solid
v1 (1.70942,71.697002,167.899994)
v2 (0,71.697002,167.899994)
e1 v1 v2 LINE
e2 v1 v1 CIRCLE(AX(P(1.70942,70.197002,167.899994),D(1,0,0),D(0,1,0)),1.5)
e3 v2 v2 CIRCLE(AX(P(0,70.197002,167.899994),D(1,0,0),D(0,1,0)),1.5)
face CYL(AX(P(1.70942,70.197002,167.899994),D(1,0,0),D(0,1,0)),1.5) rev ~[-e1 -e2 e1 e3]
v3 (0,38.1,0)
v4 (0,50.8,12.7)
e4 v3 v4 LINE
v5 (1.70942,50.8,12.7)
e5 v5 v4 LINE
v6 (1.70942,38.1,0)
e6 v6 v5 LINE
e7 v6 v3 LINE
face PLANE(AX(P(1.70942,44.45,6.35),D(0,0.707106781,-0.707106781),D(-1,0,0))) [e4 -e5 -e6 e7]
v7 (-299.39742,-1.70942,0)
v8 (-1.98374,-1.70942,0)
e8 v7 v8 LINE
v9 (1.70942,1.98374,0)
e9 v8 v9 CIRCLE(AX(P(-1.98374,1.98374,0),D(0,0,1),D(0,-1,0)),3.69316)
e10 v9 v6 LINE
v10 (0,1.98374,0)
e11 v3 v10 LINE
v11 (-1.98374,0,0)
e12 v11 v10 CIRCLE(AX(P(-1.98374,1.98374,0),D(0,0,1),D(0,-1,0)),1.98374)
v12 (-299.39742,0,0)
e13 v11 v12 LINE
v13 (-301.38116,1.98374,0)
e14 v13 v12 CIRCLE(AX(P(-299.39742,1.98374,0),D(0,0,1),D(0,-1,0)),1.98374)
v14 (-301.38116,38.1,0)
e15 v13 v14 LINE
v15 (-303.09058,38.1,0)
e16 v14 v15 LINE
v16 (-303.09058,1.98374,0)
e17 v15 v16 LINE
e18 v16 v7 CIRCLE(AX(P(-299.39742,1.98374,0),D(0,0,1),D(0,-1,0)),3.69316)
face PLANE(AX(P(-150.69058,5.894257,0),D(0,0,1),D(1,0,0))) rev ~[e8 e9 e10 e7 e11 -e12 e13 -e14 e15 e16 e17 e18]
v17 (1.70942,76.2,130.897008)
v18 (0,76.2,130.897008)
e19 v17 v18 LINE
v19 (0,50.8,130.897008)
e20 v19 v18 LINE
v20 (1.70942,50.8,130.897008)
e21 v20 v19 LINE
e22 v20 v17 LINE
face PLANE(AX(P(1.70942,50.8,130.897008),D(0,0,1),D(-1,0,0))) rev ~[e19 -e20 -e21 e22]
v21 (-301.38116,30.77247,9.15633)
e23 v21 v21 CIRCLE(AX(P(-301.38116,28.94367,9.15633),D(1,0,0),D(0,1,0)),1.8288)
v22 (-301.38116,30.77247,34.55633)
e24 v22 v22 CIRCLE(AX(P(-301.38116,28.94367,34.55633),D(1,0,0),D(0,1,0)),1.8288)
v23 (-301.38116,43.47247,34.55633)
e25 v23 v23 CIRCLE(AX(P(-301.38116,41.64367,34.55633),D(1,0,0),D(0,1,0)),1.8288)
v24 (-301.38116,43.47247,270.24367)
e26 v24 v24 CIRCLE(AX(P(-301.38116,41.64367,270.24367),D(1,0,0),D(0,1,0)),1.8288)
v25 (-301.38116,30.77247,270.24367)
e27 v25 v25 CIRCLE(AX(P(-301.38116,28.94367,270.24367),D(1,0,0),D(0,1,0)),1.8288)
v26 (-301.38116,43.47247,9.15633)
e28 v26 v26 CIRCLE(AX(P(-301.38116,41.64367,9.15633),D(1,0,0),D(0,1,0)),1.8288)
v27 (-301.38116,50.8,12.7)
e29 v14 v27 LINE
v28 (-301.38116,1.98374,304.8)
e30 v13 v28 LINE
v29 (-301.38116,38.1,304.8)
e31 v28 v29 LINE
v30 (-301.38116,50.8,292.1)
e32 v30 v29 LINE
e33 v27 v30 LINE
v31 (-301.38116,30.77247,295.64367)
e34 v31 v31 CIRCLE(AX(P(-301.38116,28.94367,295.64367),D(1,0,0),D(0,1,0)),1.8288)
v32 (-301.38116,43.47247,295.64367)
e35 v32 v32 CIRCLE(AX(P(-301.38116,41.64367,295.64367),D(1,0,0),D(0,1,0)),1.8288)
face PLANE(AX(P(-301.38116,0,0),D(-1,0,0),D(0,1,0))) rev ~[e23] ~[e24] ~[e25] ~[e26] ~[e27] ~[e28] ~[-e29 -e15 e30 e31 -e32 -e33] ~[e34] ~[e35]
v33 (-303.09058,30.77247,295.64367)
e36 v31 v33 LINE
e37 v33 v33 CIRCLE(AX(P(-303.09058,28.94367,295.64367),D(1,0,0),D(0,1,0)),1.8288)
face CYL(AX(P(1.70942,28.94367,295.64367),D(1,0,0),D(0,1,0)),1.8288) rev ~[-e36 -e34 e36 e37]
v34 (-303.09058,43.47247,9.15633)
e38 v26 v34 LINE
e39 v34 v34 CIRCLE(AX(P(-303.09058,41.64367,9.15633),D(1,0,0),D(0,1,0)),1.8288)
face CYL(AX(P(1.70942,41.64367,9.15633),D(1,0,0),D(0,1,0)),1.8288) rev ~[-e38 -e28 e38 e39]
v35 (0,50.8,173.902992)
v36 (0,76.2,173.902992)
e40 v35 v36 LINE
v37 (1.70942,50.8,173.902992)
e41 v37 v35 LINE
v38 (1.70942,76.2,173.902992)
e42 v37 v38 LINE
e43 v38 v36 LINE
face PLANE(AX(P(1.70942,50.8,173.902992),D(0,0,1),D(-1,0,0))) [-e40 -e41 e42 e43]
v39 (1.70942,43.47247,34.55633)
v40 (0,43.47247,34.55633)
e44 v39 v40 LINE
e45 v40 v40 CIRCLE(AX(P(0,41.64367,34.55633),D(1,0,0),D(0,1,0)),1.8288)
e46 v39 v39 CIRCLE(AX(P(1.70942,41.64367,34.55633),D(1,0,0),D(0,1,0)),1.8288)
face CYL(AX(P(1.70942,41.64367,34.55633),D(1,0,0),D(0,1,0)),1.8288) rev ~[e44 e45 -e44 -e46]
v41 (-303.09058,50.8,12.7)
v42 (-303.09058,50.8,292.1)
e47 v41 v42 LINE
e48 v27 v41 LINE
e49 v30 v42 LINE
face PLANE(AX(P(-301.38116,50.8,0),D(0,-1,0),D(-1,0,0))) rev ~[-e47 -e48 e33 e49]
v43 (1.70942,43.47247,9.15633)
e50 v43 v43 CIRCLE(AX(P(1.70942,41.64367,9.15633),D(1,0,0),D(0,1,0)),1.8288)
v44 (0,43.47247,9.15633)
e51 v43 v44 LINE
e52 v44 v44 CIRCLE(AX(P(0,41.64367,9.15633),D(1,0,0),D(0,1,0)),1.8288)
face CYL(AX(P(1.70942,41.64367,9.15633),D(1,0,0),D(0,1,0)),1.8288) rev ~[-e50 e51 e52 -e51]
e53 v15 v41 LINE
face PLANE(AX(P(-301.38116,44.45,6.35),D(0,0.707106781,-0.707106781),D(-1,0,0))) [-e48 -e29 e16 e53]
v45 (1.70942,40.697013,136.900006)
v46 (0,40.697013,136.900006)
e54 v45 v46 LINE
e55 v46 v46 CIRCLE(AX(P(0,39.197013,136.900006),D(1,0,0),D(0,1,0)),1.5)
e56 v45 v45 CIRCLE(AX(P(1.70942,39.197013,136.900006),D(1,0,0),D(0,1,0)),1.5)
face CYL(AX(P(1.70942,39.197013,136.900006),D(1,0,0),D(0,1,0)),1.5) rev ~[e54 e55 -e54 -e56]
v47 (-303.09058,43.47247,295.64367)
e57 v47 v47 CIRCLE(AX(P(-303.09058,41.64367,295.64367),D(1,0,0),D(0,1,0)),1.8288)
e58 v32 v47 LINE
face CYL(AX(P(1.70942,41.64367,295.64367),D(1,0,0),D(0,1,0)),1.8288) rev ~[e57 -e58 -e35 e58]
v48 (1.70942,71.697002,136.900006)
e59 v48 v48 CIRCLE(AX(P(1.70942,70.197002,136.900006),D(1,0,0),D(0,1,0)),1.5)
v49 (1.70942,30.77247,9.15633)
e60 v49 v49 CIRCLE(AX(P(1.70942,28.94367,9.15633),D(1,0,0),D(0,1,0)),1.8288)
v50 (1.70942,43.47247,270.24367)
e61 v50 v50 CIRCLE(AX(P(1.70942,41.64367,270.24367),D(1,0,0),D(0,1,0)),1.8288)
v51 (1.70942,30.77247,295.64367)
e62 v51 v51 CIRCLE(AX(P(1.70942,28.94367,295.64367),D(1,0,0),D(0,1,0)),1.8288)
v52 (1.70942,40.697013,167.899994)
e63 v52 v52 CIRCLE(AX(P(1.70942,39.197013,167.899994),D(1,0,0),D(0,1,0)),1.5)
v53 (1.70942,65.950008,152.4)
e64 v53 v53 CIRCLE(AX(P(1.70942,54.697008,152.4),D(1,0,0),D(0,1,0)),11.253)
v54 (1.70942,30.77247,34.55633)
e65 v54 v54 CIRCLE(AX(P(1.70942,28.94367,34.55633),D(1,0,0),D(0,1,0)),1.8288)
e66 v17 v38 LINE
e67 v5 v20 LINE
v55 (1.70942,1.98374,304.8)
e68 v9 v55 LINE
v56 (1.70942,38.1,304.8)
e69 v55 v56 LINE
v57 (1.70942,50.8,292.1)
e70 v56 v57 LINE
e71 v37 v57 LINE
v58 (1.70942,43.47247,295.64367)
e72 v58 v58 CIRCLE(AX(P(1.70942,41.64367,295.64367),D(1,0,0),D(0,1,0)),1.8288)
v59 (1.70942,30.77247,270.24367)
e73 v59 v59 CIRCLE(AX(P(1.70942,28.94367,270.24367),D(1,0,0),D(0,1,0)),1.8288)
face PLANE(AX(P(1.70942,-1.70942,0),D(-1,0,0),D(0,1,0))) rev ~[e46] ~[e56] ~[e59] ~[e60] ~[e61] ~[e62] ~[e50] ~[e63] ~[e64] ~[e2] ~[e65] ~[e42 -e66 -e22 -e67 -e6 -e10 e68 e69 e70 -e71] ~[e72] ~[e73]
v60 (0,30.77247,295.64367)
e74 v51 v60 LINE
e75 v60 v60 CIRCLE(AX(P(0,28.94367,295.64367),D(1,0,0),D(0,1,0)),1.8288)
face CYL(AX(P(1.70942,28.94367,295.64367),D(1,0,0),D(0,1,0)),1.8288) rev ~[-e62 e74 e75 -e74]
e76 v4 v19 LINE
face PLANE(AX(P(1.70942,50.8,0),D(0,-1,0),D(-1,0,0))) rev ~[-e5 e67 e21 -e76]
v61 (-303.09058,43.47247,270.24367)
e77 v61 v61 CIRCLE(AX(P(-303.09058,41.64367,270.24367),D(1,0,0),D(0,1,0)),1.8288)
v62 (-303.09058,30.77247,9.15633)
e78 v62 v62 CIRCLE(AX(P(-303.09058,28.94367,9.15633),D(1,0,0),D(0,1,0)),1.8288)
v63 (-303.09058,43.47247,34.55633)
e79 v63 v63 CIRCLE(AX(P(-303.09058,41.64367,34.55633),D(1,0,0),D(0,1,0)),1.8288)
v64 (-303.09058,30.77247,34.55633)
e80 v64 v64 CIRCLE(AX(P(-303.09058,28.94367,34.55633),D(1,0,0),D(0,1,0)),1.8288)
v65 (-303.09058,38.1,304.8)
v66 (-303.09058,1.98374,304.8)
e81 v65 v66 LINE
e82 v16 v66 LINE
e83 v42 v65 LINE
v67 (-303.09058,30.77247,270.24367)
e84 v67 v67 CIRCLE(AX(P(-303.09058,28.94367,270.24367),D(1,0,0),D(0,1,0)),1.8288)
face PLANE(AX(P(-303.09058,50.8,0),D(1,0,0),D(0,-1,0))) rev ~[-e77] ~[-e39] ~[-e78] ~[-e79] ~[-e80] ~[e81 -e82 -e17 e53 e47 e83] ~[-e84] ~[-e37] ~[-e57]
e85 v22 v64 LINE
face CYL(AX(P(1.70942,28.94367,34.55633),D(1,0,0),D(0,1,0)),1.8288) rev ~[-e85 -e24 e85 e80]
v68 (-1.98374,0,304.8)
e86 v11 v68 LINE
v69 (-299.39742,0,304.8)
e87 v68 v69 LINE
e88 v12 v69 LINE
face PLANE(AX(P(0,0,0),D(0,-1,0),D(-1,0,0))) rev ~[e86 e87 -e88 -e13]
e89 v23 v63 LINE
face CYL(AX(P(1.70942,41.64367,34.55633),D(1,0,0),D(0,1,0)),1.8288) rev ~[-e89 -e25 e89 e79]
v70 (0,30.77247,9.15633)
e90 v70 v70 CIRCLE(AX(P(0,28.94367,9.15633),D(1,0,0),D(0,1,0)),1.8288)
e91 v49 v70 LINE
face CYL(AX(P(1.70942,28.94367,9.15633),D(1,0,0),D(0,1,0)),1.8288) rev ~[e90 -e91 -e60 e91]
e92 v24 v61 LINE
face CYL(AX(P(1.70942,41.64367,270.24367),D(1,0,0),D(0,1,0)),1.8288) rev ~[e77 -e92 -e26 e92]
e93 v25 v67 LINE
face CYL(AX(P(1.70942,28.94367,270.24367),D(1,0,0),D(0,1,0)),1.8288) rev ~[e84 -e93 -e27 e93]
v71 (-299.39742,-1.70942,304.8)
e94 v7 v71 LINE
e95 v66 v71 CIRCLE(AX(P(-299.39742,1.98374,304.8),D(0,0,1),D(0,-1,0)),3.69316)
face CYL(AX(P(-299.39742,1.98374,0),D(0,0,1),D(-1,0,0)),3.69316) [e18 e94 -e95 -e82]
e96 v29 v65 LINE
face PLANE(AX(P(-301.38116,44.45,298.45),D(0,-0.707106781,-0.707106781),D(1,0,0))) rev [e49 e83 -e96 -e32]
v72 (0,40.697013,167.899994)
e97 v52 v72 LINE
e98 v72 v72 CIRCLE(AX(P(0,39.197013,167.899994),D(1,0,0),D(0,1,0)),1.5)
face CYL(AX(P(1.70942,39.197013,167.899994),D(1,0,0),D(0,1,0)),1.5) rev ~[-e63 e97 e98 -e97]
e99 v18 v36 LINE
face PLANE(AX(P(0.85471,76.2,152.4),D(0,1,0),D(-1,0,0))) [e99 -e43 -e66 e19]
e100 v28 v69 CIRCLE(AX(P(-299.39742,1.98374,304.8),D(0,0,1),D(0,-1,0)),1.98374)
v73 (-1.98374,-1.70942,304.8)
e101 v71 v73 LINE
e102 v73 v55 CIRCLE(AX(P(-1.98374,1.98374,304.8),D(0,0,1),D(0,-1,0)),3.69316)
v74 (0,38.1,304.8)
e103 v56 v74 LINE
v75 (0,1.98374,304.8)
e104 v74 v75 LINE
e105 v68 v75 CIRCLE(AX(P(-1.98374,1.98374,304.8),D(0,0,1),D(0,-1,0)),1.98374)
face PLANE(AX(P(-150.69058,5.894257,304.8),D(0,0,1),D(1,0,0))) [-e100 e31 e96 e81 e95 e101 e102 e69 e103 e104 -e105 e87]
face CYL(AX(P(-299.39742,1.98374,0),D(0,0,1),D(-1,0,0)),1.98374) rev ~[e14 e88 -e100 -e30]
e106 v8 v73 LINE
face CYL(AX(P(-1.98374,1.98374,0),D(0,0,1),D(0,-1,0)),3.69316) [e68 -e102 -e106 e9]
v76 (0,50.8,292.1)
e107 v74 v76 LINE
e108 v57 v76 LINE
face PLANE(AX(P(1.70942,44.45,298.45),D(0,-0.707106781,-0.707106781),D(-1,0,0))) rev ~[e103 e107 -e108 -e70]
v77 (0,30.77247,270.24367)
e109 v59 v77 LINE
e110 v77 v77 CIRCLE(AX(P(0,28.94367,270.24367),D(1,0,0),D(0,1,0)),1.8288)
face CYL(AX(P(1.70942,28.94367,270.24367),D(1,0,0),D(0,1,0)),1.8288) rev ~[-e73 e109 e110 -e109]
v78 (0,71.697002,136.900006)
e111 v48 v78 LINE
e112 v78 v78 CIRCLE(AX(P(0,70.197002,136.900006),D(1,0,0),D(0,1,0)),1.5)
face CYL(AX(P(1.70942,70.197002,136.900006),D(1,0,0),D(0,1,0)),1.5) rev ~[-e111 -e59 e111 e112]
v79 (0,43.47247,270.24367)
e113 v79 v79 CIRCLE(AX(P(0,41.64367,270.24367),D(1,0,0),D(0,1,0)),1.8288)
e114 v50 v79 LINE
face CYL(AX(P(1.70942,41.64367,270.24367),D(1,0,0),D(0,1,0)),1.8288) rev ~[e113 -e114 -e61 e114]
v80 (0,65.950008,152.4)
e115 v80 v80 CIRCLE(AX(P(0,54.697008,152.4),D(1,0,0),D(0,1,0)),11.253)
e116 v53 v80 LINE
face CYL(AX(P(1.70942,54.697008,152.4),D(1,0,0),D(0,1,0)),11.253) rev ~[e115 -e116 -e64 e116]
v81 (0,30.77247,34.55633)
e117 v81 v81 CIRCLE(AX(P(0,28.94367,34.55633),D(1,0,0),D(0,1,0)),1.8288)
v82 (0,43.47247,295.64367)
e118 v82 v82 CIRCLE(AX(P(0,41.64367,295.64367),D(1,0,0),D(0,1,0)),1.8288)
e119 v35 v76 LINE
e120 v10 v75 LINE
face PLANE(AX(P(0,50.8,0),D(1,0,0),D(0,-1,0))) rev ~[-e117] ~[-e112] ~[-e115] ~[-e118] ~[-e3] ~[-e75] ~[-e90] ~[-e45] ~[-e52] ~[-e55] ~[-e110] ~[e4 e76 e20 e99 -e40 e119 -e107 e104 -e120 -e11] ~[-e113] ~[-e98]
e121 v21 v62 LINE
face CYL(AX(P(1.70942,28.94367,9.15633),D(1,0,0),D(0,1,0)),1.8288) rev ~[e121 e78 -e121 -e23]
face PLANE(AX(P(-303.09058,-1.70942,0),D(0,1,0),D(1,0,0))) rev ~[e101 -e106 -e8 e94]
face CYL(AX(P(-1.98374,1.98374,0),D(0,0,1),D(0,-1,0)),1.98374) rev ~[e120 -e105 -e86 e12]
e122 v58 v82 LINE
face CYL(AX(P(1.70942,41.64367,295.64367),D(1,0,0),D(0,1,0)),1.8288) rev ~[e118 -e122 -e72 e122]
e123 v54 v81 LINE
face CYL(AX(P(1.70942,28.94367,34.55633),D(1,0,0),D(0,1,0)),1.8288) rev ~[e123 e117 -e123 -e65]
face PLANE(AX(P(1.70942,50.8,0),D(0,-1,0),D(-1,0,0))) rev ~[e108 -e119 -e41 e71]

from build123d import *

# Parameters (mm, degrees)
F1_DEPTH  = 304.8
F2_R      = 3.69316
F3_R      = 1.98374
F4_W      = 1.70942
F4_H      = 43.0059846
F5_DEPTH  = 25.4
F6_R      = 11.2530001
F6_R_2    = 1.5
F7_DEPTH  = 1.70942
F8_SIZE   = 12.7
F9_R      = 1.8288
F10_DEPTH = 304.8


with BuildPart() as f1:
    # F0 (on Top) → F1 (new body)
    with BuildSketch(Plane.XY):
        Polygon((0, 50.8), (0, 0), (-301.38116, 0), (-301.38116, 50.8), (-303.09058, 50.8), (-303.09058, -1.70942), (1.70942, -1.70942), (1.70942, 50.8), align=None)
    extrude(amount=F1_DEPTH)

    # F2
    f2_edges = [f1.edges().sort_by_distance(p)[0] for p in [
        (1.70942, -1.70942, 152.4),
        (-303.09058, -1.70942, 152.4),
    ]]
    fillet(f2_edges, radius=F2_R)

    # F3
    f3_edges = [f1.edges().sort_by_distance(p)[0] for p in [
        (0, 0, 152.4),
        (-301.38116, 0, 152.4),
    ]]
    fillet(f3_edges, radius=F3_R)

    # F4 (on face) → F5 (join)
    with BuildSketch(Plane(origin=(0, 50.8, 0), x_dir=(-1, 0, 0), z_dir=(0, 1, 0))):
        with Locations((-0.85471, 152.4)):
            Rectangle(F4_W, F4_H)
    extrude(amount=F5_DEPTH)

    # F6 (on face) → F7 (cut, through all)
    with BuildSketch(Plane.YZ.offset(1.70942)):
        with Locations((54.6970077, 152.4)):
            Circle(F6_R)
        with Locations((70.1970021, 136.9000056)):
            Circle(F6_R_2)
        with Locations((39.1970133, 136.9000056)):
            Circle(F6_R_2)
        with Locations((39.1970133, 167.8999944)):
            Circle(F6_R_2)
        with Locations((70.1970021, 167.8999944)):
            Circle(F6_R_2)
    extrude(amount=-F7_DEPTH, mode=Mode.SUBTRACT)

    # F8
    f8_edges = [f1.edges().sort_by_distance(p)[0] for p in [
        (0.85471, 50.8, 0),
        (-302.23587, 50.8, 0),
        (-302.23587, 50.8, 304.8),
        (0.85471, 50.8, 304.8),
    ]]
    chamfer(f8_edges, length=F8_SIZE)

    # F9 (on face) → F10 (cut, through all)
    with BuildSketch(Plane.YZ.offset(1.70942)):
        with Locations((41.6436699622, 295.6436699622)):
            Circle(F9_R)
        with Locations((41.6436699622, 270.2436699622)):
            Circle(F9_R)
        with Locations((28.9436699622, 270.2436699622)):
            Circle(F9_R)
        with Locations((28.9436699622, 295.6436699622)):
            Circle(F9_R)
        with Locations((41.6436699622, 34.5563300378)):
            Circle(F9_R)
        with Locations((41.6436699622, 9.1563300378)):
            Circle(F9_R)
        with Locations((28.9436699622, 9.1563300378)):
            Circle(F9_R)
        with Locations((28.9436699622, 34.5563300378)):
            Circle(F9_R)
    extrude(amount=-F10_DEPTH, mode=Mode.SUBTRACT)


solid = f1.part
